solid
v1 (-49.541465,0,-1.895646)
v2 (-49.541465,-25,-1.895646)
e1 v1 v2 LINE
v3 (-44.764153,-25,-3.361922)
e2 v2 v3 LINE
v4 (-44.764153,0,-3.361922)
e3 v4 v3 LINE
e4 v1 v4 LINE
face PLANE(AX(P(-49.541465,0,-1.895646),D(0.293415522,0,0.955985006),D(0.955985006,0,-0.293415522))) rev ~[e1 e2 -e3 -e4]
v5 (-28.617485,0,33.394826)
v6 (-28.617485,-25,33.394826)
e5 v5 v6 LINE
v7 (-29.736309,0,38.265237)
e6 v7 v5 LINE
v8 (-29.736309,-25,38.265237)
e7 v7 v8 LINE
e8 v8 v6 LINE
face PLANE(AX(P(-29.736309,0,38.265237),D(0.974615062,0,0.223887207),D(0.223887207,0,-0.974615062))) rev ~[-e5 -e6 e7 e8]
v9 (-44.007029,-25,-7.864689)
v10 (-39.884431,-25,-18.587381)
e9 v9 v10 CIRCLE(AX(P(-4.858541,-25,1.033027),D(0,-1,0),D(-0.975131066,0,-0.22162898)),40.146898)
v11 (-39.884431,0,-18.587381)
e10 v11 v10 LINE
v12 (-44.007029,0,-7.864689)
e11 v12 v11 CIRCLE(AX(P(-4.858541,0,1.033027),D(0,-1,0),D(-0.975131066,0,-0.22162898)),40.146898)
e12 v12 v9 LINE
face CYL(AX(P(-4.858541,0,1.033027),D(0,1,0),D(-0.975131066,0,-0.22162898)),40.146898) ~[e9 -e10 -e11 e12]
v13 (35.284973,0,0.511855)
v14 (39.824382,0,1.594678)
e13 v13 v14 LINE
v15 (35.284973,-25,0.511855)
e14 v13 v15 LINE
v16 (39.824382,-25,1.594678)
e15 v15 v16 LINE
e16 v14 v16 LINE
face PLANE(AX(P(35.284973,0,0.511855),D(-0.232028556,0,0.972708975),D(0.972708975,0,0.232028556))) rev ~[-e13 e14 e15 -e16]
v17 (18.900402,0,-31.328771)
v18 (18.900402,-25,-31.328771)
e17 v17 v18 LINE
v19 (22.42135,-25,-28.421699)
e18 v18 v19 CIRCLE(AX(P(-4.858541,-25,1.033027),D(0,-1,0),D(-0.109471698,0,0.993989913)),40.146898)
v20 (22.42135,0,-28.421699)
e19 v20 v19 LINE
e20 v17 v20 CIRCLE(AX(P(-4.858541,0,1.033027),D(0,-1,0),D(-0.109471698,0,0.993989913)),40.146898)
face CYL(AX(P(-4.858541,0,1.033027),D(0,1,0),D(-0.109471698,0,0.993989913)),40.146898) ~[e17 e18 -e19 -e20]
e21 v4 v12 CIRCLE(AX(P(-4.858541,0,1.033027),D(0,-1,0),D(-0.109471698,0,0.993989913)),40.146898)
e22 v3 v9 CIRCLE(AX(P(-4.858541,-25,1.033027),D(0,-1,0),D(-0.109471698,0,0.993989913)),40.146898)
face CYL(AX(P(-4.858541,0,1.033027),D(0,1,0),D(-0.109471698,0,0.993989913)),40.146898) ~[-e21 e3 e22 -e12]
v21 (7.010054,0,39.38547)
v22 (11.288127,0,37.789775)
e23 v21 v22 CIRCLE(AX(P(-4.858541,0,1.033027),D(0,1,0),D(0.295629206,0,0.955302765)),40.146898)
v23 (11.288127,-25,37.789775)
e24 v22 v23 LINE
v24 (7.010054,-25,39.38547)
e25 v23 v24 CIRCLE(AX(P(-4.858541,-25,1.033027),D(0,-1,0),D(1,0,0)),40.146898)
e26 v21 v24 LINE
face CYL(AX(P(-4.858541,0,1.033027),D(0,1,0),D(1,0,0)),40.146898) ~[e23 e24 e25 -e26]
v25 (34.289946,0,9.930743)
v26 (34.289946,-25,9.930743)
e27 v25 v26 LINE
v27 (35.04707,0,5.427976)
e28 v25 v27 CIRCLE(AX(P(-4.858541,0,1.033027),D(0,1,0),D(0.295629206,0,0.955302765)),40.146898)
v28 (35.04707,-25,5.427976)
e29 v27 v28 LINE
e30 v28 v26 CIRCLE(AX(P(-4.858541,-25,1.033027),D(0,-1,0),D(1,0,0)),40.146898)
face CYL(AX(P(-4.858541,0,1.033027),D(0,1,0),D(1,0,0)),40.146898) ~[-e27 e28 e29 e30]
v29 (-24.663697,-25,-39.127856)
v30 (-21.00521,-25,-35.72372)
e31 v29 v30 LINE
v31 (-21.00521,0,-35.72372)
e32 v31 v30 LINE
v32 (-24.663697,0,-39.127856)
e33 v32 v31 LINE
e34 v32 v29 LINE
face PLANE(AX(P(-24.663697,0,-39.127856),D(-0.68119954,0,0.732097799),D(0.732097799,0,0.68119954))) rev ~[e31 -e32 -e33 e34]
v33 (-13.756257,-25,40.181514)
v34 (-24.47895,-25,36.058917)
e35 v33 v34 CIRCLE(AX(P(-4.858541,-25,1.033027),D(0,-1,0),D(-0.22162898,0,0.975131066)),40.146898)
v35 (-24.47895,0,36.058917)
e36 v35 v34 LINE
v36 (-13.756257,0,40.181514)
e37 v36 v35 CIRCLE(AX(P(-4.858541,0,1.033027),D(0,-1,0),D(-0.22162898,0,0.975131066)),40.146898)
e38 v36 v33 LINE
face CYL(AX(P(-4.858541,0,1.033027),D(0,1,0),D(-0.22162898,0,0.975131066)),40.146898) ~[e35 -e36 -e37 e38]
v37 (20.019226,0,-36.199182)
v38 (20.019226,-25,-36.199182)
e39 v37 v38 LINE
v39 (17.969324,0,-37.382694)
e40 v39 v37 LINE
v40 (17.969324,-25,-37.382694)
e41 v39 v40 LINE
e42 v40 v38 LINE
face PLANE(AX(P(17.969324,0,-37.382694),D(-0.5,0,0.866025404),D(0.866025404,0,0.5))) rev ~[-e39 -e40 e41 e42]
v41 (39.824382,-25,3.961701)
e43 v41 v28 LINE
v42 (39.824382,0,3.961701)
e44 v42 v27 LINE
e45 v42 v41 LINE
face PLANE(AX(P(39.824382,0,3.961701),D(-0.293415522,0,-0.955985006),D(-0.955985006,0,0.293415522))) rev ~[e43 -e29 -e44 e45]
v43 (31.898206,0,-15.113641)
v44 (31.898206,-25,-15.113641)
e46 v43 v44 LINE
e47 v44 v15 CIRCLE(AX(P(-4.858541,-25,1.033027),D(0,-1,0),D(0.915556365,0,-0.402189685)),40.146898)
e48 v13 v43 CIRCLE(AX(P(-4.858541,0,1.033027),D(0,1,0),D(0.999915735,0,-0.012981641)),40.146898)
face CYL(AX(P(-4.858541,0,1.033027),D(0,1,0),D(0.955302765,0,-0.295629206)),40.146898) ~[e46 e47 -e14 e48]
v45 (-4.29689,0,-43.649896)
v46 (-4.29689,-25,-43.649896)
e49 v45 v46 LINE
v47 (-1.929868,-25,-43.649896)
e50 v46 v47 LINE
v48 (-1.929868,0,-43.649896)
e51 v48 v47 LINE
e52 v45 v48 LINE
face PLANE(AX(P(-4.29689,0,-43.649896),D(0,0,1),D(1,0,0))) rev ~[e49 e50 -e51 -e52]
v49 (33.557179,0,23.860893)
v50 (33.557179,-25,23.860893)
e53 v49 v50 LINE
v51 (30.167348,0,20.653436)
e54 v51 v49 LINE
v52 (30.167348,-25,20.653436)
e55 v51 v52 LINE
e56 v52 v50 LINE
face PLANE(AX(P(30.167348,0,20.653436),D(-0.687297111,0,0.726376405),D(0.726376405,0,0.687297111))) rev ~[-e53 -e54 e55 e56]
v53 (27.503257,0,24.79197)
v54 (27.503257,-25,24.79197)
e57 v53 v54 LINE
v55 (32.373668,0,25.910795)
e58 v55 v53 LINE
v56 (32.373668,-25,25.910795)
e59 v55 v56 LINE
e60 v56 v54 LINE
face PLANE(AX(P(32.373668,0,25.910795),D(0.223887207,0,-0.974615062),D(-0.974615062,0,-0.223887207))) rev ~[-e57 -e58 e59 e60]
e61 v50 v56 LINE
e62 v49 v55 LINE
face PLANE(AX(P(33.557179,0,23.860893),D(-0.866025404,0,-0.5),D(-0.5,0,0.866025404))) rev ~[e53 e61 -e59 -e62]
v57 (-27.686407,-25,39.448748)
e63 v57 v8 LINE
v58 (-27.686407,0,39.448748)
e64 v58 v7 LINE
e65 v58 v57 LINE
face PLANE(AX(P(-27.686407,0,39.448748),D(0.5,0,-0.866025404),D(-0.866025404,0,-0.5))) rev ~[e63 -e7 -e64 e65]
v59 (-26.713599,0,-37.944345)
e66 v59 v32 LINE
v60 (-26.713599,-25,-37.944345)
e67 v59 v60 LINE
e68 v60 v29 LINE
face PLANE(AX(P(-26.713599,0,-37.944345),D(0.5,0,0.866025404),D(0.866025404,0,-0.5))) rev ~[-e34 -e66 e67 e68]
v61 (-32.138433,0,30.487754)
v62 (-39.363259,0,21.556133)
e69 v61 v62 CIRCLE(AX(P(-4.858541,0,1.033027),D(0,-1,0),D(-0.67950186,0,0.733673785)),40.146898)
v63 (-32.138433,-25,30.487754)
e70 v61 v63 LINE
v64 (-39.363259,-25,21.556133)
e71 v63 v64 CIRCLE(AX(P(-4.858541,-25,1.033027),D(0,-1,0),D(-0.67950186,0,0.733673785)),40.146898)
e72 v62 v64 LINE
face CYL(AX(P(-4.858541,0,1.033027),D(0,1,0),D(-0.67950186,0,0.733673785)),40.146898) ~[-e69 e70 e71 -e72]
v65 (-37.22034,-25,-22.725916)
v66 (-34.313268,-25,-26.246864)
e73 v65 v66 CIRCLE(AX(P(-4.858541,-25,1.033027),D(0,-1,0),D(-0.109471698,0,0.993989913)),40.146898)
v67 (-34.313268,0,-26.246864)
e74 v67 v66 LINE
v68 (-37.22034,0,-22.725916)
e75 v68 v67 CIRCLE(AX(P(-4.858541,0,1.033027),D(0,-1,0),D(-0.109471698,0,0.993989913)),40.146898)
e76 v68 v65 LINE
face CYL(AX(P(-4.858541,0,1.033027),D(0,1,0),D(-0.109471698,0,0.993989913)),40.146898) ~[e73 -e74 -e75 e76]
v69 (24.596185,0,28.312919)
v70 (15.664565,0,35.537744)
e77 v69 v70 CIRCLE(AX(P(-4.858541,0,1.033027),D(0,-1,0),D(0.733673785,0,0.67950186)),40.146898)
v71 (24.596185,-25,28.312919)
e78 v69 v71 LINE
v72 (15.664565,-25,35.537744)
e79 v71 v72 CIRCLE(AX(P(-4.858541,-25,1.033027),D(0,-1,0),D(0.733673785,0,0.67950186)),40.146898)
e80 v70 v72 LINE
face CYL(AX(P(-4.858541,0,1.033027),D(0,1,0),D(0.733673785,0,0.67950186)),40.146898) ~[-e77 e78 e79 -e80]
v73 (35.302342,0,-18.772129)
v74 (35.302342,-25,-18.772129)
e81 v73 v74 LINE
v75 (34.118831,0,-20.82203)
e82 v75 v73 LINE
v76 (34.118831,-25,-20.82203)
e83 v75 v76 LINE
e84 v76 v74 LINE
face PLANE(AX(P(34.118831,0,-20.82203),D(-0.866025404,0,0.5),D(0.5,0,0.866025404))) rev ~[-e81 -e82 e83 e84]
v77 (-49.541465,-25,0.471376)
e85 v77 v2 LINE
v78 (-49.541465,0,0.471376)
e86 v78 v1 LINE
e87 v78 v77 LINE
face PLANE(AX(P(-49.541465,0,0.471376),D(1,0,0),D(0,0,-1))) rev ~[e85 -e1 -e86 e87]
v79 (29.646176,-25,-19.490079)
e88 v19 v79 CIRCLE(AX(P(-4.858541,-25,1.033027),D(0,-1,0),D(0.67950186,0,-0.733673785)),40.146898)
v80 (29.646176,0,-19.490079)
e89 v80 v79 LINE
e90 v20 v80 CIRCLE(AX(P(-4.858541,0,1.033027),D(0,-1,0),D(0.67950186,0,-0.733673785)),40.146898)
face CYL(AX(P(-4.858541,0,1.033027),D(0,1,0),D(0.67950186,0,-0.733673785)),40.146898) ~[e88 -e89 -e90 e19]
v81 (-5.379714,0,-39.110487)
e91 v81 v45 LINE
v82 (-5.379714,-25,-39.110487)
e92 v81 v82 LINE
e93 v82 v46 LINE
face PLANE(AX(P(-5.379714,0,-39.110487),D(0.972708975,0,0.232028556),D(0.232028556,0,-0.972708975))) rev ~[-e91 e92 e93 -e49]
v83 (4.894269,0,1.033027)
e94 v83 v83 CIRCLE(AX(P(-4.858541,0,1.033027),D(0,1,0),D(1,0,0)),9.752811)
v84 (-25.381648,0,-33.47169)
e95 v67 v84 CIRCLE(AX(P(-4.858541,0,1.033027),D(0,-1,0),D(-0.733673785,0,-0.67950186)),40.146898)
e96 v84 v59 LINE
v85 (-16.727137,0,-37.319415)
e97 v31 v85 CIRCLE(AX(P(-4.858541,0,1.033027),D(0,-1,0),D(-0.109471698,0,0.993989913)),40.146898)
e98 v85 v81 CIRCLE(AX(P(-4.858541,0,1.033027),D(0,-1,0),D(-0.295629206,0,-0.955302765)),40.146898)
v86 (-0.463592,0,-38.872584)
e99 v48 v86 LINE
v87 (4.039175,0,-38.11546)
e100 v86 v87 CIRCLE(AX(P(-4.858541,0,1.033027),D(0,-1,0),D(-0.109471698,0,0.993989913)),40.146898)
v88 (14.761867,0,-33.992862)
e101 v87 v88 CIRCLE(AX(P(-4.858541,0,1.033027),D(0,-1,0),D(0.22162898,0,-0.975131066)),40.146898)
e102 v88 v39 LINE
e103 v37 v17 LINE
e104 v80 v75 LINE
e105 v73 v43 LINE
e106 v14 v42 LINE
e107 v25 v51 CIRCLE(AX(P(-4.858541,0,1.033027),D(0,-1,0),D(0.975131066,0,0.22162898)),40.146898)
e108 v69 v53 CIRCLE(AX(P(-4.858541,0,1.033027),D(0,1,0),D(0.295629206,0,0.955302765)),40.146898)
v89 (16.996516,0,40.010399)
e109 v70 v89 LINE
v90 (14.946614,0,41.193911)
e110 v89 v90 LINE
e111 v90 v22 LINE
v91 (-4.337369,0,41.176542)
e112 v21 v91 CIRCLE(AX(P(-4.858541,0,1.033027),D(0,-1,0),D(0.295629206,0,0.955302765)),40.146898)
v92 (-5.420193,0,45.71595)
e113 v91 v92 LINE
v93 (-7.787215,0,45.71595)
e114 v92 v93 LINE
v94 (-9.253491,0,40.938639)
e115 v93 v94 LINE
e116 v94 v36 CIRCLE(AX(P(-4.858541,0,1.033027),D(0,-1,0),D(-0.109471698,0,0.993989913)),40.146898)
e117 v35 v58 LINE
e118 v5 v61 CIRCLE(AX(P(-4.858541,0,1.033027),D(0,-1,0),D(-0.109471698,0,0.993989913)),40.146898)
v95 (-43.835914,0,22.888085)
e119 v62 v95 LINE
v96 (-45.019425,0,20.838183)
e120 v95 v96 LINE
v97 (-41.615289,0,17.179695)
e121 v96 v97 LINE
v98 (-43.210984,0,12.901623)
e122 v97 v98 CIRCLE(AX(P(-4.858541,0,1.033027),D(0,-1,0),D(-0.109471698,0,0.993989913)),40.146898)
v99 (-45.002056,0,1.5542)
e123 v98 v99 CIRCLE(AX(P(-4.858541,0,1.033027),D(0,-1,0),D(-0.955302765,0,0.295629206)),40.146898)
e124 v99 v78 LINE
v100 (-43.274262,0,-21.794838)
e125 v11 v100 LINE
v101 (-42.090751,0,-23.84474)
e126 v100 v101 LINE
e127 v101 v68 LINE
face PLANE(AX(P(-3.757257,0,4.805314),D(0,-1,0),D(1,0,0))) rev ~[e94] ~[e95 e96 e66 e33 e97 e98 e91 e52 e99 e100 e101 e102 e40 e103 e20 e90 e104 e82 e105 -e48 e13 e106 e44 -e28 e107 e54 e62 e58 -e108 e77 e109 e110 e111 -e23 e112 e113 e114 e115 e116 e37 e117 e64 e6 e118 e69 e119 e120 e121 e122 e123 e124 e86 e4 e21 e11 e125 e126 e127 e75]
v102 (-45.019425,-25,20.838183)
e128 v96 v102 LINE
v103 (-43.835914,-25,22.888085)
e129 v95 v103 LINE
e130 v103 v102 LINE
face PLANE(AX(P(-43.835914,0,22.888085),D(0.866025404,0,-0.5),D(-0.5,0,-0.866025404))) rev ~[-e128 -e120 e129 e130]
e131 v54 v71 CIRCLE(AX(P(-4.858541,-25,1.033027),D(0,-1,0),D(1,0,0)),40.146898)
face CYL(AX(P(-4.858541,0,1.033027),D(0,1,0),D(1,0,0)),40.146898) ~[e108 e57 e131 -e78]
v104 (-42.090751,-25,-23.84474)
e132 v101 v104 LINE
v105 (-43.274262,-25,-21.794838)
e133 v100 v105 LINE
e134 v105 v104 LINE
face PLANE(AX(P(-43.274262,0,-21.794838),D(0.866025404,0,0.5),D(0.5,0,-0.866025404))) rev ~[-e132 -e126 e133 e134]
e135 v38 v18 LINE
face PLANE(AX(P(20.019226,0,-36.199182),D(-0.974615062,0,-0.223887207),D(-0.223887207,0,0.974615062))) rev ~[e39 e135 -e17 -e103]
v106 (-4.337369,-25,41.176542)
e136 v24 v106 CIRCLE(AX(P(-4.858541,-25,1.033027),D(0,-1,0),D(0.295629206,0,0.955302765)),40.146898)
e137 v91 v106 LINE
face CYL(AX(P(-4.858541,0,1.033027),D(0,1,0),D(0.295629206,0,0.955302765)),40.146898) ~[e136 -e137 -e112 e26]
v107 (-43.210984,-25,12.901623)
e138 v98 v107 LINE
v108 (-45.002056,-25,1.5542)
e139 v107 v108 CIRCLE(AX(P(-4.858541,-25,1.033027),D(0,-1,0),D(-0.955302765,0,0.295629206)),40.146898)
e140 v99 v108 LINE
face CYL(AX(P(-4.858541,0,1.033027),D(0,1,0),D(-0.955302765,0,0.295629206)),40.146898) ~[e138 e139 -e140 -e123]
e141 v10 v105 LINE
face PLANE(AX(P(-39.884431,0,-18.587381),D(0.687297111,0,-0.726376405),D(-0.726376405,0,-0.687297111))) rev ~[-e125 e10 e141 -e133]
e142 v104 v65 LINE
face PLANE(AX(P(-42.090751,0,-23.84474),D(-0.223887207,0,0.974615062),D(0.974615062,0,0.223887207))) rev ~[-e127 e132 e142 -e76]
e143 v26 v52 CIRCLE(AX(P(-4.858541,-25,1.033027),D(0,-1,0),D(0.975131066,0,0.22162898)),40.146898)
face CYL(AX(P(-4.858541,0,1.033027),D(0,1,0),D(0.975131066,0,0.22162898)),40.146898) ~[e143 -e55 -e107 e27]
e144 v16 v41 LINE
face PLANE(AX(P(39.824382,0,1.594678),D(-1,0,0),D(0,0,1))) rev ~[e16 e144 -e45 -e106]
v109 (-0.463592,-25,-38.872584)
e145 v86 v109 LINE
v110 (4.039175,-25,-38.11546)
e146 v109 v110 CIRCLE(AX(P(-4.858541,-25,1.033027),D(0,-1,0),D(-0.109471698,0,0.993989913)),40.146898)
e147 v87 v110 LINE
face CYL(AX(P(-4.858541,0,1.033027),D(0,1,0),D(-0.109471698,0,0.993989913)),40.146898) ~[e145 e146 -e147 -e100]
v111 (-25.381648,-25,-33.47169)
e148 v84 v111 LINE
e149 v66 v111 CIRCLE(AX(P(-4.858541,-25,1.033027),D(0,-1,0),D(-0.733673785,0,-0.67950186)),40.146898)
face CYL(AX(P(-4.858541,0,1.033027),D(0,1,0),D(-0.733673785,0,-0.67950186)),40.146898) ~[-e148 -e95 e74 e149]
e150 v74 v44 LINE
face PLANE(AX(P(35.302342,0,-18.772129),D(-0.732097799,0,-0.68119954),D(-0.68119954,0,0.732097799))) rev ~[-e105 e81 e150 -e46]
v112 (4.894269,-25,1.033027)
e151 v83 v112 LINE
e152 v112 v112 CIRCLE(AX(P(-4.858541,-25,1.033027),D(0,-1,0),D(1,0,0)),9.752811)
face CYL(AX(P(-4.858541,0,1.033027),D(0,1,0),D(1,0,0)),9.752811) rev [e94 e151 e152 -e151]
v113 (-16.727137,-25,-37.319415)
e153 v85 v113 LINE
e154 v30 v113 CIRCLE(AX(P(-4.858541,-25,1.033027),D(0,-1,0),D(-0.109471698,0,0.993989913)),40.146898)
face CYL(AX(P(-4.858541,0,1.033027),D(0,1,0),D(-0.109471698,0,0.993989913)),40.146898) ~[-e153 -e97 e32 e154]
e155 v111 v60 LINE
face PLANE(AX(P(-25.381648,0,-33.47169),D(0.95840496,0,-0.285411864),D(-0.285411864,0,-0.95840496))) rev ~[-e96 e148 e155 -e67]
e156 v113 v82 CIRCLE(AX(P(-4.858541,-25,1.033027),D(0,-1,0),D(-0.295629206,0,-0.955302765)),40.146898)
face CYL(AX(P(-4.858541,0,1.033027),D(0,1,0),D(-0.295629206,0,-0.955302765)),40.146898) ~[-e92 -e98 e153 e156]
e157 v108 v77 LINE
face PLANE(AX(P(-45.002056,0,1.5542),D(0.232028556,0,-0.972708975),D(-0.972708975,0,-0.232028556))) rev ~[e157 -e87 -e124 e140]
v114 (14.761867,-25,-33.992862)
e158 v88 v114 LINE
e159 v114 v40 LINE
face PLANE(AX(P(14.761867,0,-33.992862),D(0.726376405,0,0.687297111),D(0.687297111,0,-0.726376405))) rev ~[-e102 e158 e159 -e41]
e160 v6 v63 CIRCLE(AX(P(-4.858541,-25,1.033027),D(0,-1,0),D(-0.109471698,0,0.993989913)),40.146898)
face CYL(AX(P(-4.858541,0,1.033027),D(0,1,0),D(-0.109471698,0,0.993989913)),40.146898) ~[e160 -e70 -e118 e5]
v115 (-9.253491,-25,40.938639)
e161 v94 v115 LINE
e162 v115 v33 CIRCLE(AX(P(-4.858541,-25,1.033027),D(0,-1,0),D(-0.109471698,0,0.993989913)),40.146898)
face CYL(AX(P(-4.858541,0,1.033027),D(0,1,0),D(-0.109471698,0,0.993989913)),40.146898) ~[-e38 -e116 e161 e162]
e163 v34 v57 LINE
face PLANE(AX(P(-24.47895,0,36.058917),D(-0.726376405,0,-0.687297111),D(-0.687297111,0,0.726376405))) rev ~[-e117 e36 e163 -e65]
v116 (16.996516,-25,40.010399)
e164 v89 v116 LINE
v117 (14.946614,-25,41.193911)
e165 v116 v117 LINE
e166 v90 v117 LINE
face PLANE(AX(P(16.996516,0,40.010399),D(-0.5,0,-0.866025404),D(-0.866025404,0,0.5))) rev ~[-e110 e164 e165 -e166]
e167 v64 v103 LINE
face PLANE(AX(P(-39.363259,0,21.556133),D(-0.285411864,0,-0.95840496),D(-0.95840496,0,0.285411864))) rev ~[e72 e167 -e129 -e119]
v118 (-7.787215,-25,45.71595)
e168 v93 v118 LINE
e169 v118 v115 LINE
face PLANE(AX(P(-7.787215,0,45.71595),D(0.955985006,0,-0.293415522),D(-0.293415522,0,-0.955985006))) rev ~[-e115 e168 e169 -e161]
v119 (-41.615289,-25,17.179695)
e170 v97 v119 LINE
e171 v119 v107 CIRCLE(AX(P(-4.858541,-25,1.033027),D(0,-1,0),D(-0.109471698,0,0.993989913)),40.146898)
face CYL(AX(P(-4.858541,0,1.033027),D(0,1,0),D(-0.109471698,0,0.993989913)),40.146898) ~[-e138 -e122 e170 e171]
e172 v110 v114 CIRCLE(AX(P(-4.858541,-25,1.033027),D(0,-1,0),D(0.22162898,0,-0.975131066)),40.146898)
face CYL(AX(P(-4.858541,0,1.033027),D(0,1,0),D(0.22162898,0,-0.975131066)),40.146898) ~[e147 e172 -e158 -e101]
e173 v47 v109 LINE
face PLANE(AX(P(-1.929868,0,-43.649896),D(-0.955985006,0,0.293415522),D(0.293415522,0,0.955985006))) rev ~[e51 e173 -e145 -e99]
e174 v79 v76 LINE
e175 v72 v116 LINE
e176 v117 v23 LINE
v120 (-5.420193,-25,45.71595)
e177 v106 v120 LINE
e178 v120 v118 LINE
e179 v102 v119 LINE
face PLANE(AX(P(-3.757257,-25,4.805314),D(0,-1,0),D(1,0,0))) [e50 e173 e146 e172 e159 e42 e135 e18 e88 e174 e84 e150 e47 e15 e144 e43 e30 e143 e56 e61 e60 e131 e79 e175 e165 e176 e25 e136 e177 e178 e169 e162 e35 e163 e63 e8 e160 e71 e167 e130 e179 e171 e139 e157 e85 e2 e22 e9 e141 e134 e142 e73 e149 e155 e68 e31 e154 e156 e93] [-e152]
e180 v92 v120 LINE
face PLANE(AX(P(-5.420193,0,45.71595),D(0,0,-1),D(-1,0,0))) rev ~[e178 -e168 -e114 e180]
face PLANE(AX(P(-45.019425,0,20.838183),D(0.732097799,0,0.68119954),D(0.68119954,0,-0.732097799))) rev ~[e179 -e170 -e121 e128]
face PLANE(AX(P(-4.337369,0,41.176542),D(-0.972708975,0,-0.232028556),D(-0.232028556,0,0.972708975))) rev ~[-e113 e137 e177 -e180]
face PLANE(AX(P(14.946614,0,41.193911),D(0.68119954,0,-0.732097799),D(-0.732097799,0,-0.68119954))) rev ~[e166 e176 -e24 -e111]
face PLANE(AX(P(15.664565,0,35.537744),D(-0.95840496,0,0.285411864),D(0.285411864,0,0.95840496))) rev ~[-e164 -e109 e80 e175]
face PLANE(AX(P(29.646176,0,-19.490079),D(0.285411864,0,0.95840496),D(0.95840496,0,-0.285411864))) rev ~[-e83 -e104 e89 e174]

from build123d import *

# Parameters (mm, degrees)
F1_DEPTH = 25
F0_R     = 9.7528106777
F2_DEPTH = 25
F3_COUNT = 12


with BuildPart() as f1:
    # F0 (on Front) → F1 (new body)
    with BuildSketch(Plane.XZ):
        with BuildLine():
            ThreePointArc((35.2883561629, 1.0330273155), (27.4544642418, 24.8582881027), (7.0100539825, 39.385469638))
            ThreePointArc((7.0100539825, 39.385469638), (1.4007375004, 40.6889829464), (-4.3373688538, 41.1765419779))
            ThreePointArc((-4.3373688538, 41.1765419779), (-6.7990788962, 41.1329986982), (-9.2534905381, 40.9386386143))
            ThreePointArc((-9.2534905381, 40.9386386143), (-31.6478100439, -28.8686194646), (35.2883561629, 1.0330273155))
        make_face()
        with BuildLine():
            ThreePointArc((-4.85854148, 30.3700273155), (14.134700216, 22.5027690116), (22.00195852, 3.5095273155))
            ThreePointArc((22.00195852, 3.5095273155), (-22.4423355568, -16.7955618523), (-8.697145824, 30.0943270504))
            ThreePointArc((-8.697145824, 30.0943270504), (-6.7827876925, 30.3010135894), (-4.85854148, 30.3700273155))
        make_face(mode=Mode.SUBTRACT)
        with BuildLine():
            ThreePointArc((-9.2534905381, 40.9386386143), (-6.7990788962, 41.1329986982), (-4.3373688538, 41.1765419779))
            Line((-4.3373688538, 41.1765419779), (-5.4201926105, 45.7159504294))
            Line((-5.4201926105, 45.7159504294), (-7.7872149896, 45.7159504294))
            Line((-7.7872149896, 45.7159504294), (-9.2534905381, 40.9386386143))
        make_face()
    extrude(amount=F1_DEPTH)

    # F0 (on Front) → F2 (join)
    with BuildSketch(Plane.XZ):
        with BuildLine():
            ThreePointArc((-8.697145824, 30.0943270504), (-22.4423355568, -16.7955618523), (22.00195852, 3.5095273155))
            ThreePointArc((22.00195852, 3.5095273155), (14.134700216, 22.5027690116), (-4.85854148, 30.3700273155))
            ThreePointArc((-4.85854148, 30.3700273155), (-6.7827876925, 30.3010135894), (-8.697145824, 30.0943270504))
        make_face()
        with Locations((-4.85854148, 1.0330273155)):
            Circle(F0_R, mode=Mode.SUBTRACT)
    extrude(amount=F2_DEPTH)

    # F3: F1 ×12 about axis
    f3_axis = Axis((-4.85854148, 0, 1.0330273155), (0, -1, 0))


with BuildPart() as f1_1:
    add(f1.part)
    for i in range(1, F3_COUNT):
        add(f1.part.rotate(f3_axis, i * 360 / F3_COUNT))


solid = f1_1.part
